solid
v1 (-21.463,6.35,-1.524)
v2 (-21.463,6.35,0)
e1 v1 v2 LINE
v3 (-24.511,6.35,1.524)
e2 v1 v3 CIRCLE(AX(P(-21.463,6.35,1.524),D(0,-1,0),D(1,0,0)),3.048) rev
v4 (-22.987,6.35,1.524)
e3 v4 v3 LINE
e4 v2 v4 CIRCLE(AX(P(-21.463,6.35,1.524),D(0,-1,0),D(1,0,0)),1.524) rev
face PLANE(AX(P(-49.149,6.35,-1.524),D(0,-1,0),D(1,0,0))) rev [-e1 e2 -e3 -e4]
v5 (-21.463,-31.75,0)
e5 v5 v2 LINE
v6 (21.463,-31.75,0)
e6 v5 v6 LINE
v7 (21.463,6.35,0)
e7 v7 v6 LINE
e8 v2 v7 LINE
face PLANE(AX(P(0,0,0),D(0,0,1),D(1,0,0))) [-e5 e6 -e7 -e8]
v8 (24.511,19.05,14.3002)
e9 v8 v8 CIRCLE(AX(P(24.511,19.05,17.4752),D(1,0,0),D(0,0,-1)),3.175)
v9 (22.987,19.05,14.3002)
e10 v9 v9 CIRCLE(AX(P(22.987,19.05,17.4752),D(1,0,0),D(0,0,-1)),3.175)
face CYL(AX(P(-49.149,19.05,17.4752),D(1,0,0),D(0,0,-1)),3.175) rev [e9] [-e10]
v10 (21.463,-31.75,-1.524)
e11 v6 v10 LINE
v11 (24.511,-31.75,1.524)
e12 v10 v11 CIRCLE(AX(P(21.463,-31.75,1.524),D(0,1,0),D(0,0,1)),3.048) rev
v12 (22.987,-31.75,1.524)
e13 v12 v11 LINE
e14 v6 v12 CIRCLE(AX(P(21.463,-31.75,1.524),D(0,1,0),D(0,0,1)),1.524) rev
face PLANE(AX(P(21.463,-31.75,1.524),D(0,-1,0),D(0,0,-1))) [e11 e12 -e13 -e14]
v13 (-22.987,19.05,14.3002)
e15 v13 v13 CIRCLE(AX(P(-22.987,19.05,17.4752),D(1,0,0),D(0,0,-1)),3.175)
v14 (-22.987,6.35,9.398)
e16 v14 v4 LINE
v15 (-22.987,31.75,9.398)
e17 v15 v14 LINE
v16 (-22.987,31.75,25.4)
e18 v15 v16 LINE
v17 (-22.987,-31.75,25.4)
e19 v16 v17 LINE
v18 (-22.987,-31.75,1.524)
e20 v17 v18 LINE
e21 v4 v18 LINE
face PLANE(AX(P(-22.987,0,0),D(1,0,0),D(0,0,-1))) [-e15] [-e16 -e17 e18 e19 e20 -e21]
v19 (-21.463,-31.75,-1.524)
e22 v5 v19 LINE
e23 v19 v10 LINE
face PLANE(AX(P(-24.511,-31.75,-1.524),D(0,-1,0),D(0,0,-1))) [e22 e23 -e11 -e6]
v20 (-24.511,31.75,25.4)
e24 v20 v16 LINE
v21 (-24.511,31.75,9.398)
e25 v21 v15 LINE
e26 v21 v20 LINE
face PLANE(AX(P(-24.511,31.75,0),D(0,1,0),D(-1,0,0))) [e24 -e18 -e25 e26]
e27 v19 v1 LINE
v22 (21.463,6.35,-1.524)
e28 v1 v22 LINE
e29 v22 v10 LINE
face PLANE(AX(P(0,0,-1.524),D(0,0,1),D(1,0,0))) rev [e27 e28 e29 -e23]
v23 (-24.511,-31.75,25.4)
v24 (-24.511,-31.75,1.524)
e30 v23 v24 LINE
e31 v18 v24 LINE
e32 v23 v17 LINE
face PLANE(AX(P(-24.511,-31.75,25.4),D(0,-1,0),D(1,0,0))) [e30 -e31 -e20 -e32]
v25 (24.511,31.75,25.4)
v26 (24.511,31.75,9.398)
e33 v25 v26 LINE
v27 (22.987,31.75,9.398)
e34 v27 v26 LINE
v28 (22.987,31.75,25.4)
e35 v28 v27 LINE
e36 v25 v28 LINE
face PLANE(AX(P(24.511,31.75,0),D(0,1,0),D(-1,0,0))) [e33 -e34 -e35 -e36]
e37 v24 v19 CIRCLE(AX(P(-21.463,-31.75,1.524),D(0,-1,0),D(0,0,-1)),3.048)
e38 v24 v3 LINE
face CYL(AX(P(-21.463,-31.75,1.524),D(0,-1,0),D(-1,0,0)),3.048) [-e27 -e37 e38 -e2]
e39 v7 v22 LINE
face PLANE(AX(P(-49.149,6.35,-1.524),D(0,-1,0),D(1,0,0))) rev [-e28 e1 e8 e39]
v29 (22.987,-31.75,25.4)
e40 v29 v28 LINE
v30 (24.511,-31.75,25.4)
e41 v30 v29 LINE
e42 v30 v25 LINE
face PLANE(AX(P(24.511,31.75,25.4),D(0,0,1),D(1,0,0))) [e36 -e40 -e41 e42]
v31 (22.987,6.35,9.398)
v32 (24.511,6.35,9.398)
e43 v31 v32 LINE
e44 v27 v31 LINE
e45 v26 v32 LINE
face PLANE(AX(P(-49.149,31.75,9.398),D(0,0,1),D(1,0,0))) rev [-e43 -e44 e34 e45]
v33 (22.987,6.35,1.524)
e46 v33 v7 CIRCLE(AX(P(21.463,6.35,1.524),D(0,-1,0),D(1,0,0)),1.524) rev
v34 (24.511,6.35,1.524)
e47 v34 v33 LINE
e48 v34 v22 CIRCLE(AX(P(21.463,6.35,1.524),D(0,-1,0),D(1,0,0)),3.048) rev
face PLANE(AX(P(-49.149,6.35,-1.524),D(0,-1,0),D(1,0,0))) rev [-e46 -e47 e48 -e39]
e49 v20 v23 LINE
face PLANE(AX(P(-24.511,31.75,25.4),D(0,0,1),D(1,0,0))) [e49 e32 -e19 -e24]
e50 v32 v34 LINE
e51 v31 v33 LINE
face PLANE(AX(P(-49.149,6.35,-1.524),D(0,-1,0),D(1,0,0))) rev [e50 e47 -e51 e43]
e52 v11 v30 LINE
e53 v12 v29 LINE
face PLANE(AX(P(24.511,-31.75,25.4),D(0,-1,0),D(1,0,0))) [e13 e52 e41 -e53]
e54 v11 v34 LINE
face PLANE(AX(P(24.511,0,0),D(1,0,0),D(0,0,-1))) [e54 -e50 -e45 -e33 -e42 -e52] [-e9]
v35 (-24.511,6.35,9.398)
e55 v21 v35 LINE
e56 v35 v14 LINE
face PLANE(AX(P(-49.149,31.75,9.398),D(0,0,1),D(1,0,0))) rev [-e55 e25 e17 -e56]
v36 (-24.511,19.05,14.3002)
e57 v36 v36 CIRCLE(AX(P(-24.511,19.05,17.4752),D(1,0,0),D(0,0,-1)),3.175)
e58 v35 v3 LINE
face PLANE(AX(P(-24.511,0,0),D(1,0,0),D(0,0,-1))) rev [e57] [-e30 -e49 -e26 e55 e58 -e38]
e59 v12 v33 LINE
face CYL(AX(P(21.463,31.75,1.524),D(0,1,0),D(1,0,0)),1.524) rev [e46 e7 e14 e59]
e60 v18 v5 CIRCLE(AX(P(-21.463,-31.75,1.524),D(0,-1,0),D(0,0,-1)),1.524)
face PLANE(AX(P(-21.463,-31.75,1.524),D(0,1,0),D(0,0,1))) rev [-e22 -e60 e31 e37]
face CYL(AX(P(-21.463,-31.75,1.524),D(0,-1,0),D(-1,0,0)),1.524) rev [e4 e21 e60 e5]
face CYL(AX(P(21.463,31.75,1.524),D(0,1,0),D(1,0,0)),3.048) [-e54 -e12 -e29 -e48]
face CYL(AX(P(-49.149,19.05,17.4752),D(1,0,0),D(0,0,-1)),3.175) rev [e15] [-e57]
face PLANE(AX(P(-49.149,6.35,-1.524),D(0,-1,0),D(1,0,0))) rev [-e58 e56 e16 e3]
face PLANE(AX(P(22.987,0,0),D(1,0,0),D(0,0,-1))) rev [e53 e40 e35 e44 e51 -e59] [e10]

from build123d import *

# Parameters (mm, degrees)
CROQUIS1_W                         = 49.022
CROQUIS1_H                         = 63.5
BRIDA_BASE1_DEPTH                  = 1.524
BRIDA_DE_ARISTA1_STRIP_W           = 9.144
BRIDA_DE_ARISTA1_STRIP_H           = 1.524
BRIDA_DE_ARISTA1_STRIP_CUT_DEPTH   = 63.5
BRIDA_DE_ARISTA1_STRIP_2_W         = 9.144
BRIDA_DE_ARISTA1_STRIP_2_H         = 1.524
BRIDA_DE_ARISTA1_STRIP_CUT_2_DEPTH = 63.5
BRIDA_DE_ARISTA1_DEPTH             = 63.5
BRIDA_DE_ARISTA1_BEND_DEPTH        = 63.5
CROQUIS23_R                        = 3.175
CROQUIS23_W                        = 10.922
CROQUIS23_H                        = 25.4
CORTAR_EXTRUIR4_DEPTH              = 73.66


# Sheet-metal steps are written as plain solids
with BuildPart() as part:
    # Croquis1 → Brida base1 (new body)
    with BuildSketch(Plane.XY):
        Rectangle(CROQUIS1_W, CROQUIS1_H)
    extrude(amount=-BRIDA_BASE1_DEPTH)

    # Brida de arista1 strip (across the edge) → Brida de arista1 strip cut (cut)
    with BuildSketch(Plane(origin=(24.511, -31.75, 0), x_dir=(-1, 0, 0), z_dir=(0, 1, 0))):
        with Locations((-1.524, -0.762)):
            Rectangle(BRIDA_DE_ARISTA1_STRIP_W, BRIDA_DE_ARISTA1_STRIP_H)
    extrude(amount=BRIDA_DE_ARISTA1_STRIP_CUT_DEPTH, mode=Mode.SUBTRACT)

    # Brida de arista1 strip 2 (across the edge) → Brida de arista1 strip cut 2 (cut)
    with BuildSketch(Plane(origin=(-24.511, 31.75, 0), x_dir=(1, 0, 0), z_dir=(0, -1, 0))):
        with Locations((-1.524, -0.762)):
            Rectangle(BRIDA_DE_ARISTA1_STRIP_2_W, BRIDA_DE_ARISTA1_STRIP_2_H)
    extrude(amount=BRIDA_DE_ARISTA1_STRIP_CUT_2_DEPTH, mode=Mode.SUBTRACT)

    # Brida de arista1 section (across the edge) → Brida de arista1 (add)
    with BuildSketch(Plane(origin=(24.511, -31.75, 0), x_dir=(-1, 0, 0), z_dir=(0, 1, 0))):
        with BuildLine():
            Line((0, 1.524), (0, 25.4))
            Line((0, 25.4), (1.524, 25.4))
            Line((1.524, 25.4), (1.524, 1.524))
            ThreePointArc((1.524, 1.524), (1.970369265, 0.446369265), (3.048, 0))
            Line((3.048, 0), (3.048, -1.524))
            ThreePointArc((3.048, -1.524), (0.892738531, -0.631261469), (0, 1.524))
        make_face()
    extrude(amount=BRIDA_DE_ARISTA1_DEPTH)

    # Brida de arista1 section 2 (across the edge) → Brida de arista1 bend (add)
    with BuildSketch(Plane(origin=(-24.511, 31.75, 0), x_dir=(1, 0, 0), z_dir=(0, -1, 0))):
        with BuildLine():
            Line((0, 1.524), (0, 25.4))
            Line((0, 25.4), (1.524, 25.4))
            Line((1.524, 25.4), (1.524, 1.524))
            ThreePointArc((1.524, 1.524), (1.970369265, 0.446369265), (3.048, 0))
            Line((3.048, 0), (3.048, -1.524))
            ThreePointArc((3.048, -1.524), (0.892738531, -0.631261469), (0, 1.524))
        make_face()
    extrude(amount=BRIDA_DE_ARISTA1_BEND_DEPTH)

    # Croquis23 → Cortar-Extruir4 (cut)
    with BuildSketch(Plane(origin=(24.511, 0, 0), x_dir=(0, 0, -1), z_dir=(1, 0, 0))):
        with Locations((-17.4752, 19.05)):
            Circle(CROQUIS23_R)
        with Locations((-3.937, 19.05)):
            Rectangle(CROQUIS23_W, CROQUIS23_H)
    extrude(amount=-CORTAR_EXTRUIR4_DEPTH, mode=Mode.SUBTRACT)


solid = part.part
